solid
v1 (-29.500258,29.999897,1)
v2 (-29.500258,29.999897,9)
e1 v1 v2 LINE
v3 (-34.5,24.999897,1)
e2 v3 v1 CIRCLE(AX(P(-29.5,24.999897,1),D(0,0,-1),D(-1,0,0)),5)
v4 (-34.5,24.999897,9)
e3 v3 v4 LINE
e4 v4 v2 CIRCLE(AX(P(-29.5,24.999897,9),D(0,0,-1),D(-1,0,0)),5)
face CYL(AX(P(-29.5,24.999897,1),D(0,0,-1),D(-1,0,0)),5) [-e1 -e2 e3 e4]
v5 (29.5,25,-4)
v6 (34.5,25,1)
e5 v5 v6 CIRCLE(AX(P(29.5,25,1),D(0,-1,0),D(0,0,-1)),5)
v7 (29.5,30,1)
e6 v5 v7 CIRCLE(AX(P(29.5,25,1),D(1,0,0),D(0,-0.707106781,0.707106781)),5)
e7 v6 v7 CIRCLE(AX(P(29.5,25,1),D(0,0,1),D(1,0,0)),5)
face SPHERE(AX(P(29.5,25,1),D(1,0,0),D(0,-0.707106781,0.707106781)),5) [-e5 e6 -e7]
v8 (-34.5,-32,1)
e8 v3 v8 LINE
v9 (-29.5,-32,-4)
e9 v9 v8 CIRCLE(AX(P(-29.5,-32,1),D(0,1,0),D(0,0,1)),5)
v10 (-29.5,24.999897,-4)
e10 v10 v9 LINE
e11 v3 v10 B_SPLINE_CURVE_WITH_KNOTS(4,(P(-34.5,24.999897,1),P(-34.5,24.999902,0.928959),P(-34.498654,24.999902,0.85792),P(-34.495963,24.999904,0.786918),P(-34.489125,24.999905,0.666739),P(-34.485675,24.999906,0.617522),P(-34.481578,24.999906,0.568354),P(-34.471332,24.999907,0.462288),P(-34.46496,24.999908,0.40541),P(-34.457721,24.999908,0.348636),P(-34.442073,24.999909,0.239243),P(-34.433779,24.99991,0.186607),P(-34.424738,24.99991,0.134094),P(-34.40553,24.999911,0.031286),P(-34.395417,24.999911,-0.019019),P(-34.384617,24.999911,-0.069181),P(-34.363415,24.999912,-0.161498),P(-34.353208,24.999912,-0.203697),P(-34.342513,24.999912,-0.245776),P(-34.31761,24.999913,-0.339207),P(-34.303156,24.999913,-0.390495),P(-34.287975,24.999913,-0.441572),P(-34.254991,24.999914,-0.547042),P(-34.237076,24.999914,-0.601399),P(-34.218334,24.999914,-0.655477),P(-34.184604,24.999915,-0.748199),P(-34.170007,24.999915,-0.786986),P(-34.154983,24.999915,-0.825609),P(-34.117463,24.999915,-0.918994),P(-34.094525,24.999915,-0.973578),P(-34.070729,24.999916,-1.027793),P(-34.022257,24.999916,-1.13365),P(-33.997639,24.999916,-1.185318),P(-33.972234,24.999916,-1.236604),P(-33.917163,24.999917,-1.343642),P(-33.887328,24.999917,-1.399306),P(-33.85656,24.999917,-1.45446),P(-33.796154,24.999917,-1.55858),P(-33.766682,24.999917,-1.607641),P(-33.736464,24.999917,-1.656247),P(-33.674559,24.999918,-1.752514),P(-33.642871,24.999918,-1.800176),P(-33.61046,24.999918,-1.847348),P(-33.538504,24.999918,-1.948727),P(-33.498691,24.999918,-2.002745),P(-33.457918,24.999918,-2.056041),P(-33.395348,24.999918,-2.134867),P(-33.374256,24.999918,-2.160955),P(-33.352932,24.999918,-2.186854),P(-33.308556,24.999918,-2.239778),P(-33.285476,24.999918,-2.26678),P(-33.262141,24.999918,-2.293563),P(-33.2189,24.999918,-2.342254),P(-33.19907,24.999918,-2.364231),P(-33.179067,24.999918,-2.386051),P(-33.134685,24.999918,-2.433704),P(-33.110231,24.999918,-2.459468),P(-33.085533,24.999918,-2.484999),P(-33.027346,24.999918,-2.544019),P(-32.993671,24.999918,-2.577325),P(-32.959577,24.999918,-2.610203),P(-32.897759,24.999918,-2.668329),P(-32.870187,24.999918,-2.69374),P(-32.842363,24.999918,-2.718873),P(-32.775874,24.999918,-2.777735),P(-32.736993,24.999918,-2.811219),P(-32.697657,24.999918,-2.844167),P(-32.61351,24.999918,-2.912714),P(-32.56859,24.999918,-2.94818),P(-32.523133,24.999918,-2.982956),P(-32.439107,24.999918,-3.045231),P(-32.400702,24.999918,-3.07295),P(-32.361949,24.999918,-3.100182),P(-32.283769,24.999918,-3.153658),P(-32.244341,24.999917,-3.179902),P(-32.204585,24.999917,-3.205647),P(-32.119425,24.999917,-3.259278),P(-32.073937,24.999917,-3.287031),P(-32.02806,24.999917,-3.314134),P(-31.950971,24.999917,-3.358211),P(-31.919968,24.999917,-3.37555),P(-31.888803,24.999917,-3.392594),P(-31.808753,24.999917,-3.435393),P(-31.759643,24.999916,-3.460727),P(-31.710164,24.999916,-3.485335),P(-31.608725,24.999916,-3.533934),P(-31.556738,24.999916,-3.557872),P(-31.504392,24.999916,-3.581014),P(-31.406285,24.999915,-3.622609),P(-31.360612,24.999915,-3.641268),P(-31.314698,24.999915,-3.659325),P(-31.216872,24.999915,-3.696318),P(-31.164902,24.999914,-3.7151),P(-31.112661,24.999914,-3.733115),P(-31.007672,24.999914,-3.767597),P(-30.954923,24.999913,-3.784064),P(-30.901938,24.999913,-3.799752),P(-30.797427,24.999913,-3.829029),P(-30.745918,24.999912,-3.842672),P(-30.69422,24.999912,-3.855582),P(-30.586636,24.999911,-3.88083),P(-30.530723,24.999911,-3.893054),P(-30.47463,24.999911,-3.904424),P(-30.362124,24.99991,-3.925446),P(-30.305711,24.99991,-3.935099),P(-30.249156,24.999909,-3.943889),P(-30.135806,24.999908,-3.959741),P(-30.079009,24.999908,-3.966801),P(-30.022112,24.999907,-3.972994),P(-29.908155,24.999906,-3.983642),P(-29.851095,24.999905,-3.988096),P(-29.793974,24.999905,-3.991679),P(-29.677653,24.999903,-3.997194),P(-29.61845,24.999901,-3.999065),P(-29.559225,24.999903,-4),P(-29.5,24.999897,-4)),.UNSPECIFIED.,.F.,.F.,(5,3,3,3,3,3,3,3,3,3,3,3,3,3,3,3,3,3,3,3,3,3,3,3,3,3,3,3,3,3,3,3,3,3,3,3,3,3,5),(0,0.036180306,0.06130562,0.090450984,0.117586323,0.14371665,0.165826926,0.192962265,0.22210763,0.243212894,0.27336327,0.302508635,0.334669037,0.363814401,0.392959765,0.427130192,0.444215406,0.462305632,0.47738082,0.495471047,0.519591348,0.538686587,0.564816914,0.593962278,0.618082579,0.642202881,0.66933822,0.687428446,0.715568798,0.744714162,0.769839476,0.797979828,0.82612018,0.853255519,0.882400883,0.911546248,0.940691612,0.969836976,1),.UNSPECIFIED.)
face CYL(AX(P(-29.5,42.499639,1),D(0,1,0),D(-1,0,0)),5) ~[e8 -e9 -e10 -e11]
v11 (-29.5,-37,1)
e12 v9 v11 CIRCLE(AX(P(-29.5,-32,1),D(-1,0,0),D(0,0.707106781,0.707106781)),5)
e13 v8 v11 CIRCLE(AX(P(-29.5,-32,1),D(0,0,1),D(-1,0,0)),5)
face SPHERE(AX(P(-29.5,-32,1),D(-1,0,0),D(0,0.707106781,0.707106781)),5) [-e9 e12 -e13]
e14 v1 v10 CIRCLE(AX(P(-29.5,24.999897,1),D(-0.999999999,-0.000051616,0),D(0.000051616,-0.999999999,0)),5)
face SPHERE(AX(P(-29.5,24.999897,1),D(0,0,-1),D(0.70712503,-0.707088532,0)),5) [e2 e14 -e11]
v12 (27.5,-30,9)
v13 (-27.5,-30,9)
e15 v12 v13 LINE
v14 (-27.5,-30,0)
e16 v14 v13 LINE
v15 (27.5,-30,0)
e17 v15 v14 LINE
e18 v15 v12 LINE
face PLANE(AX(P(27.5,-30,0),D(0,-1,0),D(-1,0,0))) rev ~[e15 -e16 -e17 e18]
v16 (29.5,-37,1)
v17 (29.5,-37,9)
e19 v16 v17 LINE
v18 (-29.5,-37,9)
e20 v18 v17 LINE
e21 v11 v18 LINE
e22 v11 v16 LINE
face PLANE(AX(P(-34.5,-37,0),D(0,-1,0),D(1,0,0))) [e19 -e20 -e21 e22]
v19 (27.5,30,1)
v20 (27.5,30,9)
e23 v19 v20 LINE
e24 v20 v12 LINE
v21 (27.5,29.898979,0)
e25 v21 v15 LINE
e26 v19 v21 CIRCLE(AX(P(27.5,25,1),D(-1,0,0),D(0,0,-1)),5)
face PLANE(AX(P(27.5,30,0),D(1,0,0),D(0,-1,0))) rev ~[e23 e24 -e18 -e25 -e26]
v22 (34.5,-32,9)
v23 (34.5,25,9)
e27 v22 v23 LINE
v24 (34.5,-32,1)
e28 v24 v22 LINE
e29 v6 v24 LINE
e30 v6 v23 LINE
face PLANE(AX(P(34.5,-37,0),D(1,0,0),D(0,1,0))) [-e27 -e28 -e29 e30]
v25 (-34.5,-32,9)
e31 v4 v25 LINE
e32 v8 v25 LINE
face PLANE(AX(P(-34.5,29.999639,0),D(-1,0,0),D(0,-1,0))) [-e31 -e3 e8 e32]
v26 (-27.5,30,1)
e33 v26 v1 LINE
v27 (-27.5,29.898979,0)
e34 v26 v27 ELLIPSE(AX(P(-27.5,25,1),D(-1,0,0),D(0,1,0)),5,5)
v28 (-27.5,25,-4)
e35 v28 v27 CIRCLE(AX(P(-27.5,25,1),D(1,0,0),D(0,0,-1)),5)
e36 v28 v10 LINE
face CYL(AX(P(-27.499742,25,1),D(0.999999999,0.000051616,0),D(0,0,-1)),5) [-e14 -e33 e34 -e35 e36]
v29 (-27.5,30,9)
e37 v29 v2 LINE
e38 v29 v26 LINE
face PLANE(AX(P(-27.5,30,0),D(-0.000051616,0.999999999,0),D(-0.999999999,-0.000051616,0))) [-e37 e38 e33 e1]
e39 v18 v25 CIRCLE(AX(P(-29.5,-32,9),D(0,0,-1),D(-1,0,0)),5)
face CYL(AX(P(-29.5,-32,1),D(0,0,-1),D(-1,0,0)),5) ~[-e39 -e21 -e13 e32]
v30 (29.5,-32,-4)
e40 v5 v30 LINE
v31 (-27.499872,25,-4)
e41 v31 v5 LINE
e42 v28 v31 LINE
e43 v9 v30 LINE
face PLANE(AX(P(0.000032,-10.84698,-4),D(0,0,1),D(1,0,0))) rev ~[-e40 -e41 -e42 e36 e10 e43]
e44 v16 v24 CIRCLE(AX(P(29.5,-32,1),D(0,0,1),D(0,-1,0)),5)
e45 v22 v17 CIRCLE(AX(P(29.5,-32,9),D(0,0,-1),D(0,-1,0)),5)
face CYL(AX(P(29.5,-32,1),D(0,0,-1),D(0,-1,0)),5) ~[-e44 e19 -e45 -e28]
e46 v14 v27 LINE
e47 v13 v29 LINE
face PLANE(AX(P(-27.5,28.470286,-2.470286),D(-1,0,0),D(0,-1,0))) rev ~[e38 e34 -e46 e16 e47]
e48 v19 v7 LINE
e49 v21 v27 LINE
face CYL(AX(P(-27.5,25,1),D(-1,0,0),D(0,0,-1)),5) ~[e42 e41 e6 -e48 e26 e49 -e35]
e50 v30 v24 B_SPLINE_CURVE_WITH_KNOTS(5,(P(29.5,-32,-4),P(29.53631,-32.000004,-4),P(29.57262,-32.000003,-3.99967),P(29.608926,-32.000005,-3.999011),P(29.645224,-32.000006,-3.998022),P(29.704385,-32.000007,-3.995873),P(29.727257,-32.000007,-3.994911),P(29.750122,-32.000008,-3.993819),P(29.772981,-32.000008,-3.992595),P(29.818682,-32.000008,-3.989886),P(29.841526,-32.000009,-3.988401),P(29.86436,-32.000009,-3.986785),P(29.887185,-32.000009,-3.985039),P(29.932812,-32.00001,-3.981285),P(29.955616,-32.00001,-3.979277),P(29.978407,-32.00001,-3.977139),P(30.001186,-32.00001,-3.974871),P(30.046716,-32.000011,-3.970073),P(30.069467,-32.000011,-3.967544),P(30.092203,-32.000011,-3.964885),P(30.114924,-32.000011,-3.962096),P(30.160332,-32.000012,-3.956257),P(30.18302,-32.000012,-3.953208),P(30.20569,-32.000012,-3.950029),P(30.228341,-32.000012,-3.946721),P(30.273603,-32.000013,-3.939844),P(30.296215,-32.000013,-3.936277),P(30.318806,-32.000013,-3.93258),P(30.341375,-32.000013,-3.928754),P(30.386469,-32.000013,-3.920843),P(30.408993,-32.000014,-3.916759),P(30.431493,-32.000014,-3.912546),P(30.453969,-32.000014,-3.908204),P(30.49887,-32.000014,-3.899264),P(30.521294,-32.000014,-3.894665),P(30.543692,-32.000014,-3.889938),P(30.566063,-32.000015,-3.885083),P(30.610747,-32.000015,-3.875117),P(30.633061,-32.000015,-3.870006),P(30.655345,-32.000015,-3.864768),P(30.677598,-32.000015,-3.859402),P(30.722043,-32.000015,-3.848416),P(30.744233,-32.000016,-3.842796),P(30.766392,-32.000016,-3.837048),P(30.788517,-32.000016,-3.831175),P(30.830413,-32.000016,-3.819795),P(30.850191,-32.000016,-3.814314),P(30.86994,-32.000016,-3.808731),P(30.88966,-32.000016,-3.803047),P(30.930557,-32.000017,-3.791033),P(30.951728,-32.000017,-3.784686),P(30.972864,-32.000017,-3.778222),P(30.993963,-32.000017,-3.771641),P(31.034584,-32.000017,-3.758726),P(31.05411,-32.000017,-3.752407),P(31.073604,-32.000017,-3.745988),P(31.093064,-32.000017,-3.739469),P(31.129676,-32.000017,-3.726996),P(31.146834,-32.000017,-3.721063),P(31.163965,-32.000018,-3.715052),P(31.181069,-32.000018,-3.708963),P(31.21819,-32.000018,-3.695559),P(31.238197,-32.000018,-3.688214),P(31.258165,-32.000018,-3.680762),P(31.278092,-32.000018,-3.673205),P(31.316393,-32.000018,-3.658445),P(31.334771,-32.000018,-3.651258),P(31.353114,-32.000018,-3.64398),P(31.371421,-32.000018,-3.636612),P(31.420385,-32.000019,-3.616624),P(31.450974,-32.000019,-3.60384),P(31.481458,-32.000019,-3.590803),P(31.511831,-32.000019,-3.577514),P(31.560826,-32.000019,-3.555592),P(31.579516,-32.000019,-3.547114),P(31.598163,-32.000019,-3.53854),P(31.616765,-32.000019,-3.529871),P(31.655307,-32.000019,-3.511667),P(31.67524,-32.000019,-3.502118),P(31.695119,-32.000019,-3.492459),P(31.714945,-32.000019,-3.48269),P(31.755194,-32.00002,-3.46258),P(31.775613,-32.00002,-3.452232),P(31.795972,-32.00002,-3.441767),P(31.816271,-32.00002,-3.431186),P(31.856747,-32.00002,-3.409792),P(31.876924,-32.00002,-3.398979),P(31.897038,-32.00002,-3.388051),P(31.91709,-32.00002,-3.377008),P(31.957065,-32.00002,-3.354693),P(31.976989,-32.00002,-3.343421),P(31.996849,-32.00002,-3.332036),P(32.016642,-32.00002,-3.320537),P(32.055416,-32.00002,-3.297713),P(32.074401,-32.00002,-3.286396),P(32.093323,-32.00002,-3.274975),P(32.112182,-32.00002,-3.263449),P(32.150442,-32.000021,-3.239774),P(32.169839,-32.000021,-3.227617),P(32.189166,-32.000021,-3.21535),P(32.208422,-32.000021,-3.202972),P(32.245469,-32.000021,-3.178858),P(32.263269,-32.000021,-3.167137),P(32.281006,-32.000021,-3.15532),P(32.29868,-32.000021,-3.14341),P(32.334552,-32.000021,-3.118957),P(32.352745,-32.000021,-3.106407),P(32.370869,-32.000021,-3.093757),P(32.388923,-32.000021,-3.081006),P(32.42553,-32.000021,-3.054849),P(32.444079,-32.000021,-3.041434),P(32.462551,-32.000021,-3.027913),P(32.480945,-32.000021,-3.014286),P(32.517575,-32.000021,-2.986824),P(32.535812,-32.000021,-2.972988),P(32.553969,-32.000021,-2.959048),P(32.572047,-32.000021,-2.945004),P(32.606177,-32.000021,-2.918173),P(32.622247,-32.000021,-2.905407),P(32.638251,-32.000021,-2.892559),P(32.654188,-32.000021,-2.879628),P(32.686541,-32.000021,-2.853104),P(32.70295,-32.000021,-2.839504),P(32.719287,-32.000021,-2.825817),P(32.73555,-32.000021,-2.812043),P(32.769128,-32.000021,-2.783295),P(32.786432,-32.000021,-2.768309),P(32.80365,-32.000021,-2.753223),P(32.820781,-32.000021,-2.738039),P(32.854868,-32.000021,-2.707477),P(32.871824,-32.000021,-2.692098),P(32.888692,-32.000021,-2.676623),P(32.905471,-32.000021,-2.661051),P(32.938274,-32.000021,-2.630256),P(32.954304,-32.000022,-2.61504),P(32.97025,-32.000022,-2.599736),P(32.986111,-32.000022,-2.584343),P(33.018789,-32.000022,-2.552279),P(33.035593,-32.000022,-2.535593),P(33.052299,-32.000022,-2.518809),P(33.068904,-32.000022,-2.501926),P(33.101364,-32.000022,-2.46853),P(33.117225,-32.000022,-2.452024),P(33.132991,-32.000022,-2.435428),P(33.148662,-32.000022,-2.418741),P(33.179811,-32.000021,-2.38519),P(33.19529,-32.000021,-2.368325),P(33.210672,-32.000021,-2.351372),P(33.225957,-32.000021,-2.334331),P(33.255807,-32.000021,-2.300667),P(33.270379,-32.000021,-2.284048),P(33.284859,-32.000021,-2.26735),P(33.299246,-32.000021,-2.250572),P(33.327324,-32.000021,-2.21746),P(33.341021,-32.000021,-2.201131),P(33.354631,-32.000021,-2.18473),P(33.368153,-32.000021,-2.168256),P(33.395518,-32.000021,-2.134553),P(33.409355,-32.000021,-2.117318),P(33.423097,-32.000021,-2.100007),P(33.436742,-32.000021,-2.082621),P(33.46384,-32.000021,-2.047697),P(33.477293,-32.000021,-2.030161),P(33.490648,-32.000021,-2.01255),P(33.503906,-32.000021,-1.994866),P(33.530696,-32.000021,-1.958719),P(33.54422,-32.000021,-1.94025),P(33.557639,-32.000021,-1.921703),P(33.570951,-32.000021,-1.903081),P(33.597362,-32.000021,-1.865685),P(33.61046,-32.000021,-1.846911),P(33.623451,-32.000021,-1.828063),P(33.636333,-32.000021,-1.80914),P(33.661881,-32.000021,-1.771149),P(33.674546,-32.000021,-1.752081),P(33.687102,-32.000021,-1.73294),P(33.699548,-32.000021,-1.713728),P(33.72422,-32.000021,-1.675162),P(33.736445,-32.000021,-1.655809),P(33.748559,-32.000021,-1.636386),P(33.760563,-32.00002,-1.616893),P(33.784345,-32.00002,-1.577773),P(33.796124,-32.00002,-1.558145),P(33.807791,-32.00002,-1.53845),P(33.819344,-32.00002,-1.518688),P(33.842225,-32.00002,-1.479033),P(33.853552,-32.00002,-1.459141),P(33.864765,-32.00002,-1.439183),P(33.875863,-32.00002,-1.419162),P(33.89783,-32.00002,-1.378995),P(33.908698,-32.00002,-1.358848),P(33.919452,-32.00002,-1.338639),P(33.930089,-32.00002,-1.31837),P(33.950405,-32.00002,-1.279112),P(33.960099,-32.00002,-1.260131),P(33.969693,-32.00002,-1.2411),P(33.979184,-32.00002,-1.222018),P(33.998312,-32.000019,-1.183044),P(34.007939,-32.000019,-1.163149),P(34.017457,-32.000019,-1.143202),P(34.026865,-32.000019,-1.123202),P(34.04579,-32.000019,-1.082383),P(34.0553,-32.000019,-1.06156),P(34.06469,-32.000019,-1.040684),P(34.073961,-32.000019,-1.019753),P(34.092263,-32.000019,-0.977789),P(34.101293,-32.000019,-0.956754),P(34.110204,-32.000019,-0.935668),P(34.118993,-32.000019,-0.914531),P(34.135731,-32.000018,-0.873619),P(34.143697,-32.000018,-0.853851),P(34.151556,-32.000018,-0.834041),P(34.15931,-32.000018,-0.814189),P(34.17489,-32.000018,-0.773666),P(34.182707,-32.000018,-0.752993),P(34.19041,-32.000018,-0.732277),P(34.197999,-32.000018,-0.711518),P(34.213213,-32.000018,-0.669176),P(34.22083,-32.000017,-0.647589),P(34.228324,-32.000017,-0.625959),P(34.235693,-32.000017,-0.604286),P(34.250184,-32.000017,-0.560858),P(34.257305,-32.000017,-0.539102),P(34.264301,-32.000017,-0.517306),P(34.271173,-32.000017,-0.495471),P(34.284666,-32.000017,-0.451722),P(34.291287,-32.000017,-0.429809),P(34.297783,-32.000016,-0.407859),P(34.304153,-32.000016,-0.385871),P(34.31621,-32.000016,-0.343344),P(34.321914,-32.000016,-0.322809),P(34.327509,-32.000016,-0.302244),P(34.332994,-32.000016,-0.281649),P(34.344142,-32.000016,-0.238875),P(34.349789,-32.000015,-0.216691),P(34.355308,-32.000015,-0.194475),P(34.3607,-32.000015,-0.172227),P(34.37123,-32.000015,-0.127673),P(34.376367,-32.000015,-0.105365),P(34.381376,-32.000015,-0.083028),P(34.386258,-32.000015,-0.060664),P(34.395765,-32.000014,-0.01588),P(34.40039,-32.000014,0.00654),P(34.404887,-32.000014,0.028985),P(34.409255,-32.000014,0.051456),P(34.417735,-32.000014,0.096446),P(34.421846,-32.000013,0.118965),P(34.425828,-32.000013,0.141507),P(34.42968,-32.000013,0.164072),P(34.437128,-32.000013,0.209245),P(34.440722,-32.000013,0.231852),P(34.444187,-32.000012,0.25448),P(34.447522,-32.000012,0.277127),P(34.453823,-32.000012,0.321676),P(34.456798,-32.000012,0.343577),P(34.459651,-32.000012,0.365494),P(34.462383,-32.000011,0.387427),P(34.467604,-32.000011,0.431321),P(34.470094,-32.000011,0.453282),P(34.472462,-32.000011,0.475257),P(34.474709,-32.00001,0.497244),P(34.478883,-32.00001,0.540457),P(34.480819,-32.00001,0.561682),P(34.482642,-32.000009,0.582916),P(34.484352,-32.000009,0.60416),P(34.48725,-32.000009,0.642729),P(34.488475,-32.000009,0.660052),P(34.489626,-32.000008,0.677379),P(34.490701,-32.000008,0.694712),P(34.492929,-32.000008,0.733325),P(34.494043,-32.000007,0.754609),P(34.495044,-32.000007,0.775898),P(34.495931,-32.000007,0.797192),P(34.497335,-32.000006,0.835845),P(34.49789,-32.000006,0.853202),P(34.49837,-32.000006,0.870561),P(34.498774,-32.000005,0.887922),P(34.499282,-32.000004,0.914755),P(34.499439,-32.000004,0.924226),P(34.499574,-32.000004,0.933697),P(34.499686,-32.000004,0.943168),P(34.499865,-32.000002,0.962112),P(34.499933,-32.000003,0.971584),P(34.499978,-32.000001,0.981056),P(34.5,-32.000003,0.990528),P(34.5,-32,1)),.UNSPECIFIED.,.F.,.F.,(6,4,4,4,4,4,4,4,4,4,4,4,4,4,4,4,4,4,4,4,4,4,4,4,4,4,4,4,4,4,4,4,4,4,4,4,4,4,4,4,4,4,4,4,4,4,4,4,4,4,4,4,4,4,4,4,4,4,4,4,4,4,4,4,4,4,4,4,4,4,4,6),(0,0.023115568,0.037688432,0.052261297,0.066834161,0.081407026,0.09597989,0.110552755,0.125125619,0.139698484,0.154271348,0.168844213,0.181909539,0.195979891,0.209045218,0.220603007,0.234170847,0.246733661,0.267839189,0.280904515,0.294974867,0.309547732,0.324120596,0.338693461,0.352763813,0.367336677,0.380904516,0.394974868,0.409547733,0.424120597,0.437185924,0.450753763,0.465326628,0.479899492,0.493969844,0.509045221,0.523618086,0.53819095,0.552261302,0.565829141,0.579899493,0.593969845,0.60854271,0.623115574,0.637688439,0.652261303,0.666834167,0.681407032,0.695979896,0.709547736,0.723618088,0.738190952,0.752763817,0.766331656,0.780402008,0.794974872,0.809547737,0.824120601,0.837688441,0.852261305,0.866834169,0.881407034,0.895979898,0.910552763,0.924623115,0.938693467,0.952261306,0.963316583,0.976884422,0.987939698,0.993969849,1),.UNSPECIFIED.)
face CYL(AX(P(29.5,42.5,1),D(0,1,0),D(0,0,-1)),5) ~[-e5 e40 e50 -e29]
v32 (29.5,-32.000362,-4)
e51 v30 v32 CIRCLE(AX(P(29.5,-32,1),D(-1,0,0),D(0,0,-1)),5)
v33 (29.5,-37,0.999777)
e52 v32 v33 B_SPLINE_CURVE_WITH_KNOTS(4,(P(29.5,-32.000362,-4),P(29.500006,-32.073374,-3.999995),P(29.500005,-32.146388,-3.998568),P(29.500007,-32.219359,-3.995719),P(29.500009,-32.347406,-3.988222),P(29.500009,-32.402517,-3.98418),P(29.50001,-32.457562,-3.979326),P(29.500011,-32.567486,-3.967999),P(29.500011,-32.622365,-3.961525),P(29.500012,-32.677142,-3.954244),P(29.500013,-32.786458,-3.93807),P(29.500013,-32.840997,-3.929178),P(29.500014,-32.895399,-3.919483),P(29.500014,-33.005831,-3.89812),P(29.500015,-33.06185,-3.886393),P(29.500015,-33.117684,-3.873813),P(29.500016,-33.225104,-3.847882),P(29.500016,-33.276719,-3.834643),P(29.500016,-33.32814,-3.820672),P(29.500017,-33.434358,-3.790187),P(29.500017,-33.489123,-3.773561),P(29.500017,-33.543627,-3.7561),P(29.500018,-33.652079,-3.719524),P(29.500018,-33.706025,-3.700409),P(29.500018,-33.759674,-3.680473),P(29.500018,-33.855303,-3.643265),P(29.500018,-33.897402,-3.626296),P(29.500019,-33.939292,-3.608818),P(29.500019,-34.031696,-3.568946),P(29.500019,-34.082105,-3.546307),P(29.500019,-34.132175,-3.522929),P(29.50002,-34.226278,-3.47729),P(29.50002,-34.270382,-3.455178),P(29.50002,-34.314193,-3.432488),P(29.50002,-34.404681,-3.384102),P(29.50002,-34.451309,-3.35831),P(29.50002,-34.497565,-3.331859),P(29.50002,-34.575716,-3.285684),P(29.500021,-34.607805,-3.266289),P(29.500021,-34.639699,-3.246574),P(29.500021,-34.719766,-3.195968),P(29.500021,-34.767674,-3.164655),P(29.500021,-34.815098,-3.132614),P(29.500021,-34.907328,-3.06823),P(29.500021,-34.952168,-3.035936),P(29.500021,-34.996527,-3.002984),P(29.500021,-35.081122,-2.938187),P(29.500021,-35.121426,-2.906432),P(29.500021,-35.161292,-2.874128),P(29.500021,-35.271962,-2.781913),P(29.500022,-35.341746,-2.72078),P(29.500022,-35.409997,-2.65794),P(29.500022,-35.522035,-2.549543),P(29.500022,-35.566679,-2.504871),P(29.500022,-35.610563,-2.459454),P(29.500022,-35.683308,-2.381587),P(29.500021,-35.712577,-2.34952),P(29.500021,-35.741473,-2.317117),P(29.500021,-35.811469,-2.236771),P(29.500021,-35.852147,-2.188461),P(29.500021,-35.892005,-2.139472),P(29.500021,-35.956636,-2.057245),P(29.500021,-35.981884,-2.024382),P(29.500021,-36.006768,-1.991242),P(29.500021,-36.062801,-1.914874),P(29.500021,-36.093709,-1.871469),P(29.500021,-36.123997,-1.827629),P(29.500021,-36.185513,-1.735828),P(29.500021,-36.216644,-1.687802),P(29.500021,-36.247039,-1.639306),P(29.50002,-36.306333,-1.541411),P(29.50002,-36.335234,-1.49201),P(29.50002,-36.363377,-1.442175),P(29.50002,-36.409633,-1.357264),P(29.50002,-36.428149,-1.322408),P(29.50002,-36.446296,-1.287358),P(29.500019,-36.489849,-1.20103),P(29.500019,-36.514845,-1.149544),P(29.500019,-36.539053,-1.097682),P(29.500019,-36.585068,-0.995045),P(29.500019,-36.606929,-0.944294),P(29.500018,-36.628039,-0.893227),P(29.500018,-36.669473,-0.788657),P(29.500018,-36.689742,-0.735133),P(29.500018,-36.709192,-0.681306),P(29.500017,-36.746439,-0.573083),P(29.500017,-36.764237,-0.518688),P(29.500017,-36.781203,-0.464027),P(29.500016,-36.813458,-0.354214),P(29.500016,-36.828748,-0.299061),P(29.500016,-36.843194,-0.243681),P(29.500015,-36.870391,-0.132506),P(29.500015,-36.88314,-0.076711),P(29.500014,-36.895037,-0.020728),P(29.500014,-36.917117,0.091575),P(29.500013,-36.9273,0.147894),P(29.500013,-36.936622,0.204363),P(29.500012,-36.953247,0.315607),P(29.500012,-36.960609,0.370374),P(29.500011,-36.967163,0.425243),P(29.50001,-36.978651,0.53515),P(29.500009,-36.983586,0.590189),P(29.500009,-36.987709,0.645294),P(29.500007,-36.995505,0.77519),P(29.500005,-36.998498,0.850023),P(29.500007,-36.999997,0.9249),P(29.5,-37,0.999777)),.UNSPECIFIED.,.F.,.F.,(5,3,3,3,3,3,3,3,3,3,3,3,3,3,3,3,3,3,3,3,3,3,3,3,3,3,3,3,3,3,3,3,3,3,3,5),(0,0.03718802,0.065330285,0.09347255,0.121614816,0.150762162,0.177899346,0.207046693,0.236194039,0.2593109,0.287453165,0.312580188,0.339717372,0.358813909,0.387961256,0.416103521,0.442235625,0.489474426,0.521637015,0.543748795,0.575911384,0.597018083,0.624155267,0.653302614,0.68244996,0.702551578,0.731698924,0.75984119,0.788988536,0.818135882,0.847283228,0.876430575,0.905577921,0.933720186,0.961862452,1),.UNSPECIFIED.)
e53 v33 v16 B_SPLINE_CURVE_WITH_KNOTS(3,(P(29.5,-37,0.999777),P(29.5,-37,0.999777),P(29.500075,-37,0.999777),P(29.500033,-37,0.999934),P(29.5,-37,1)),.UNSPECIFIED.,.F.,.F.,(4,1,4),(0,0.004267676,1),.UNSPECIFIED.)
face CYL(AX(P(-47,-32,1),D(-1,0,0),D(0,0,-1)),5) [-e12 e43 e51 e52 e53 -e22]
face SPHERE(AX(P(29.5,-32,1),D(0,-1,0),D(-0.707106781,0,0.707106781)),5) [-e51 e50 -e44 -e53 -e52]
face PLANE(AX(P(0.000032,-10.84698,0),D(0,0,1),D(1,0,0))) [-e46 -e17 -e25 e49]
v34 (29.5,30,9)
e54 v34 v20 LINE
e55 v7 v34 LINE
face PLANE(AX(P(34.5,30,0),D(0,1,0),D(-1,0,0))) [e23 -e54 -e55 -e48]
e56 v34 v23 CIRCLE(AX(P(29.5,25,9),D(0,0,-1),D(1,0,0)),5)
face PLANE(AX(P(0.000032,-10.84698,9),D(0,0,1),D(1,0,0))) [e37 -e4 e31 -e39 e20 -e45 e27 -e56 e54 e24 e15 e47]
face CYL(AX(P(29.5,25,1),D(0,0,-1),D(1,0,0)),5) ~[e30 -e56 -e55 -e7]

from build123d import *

# Parameters (mm, degrees)
F1_DEPTH     = 9
F0_W         = 55
F0_H         = 60
F2_DEPTH     = 4
F3_T1_DEPTH  = 74.5
F3_T3_DEPTH  = 19.5
F3_T5_DEPTH  = 92
F3_T7_DEPTH  = 91.9996386864
F3_T9_DEPTH  = 93.9999999907
F4_T1_DEPTH  = 20.5
F4_T3_DEPTH  = 20.4993548139
F4_T8_DEPTH  = 5
F4_S13_W     = 5
F4_S13_H     = 5
F4_T14_DEPTH = 5
F4_S19_W     = 5
F4_S19_H     = 5
F4_T20_DEPTH = 5
F4_S25_W     = 5
F4_S25_H     = 5
F4_T26_DEPTH = 5


# Not quite as in the source:
# - a fillet or chamfer that OpenCascade refuses, or shapes differently, is made with other operations: its cross-section is extruded or revolved along the edge and cut away or added


with BuildPart() as f1:
    # F0 (on Top) → F1 (new body)
    with BuildSketch(Plane.XY):
        Polygon((27.5, 30), (27.5, -30), (-27.5, -30), (-27.5, 30), (-34.4999999907, 29.9996386864), (-34.4999999907, -37), (34.5, -37), (34.5, 30), align=None)
    extrude(amount=F1_DEPTH)

    # F0 (on Top) → F2 (join)
    with BuildSketch(Plane.XY):
        Polygon((27.5, 30), (27.5, -30), (-27.5, -30), (-27.5, 30), (-34.4999999907, 29.9996386864), (-34.4999999907, -37), (34.5, -37), (34.5, 30), align=None)
        Rectangle(F0_W, F0_H)
    extrude(amount=-F2_DEPTH)

    # F3: fillet of radius 5 on 5 edges, made by hand

    # F3_s2 → F3_t1 (cut)
    with BuildSketch(Plane.YZ.offset(-27.5)):
        with BuildLine():
            ThreePointArc((25, -4), (28.5355339059, -2.5355339059), (30, 1))
            Line((30, 1), (30, -4))
            Line((30, -4), (25, -4))
        make_face()
    extrude(amount=F3_T1_DEPTH, mode=Mode.SUBTRACT)

    # F3_s4 → F3_t3 (cut)
    with BuildSketch(Plane(origin=(-27.4984514401, -0.0014193662, 0), x_dir=(0, 0, 1), z_dir=(-0.9999999987, -5.16162e-05, 0))):
        with BuildLine():
            ThreePointArc((-4, 25.0014194062), (-2.5355339059, 28.5369533121), (1, 30.0014194062))
            Line((1, 30.0014194062), (-4, 30.0014194062))
            Line((-4, 30.0014194062), (-4, 25.0014194062))
        make_face()
    extrude(amount=F3_T3_DEPTH, mode=Mode.SUBTRACT)

    # F3_s6 → F3_t5 (cut)
    with BuildSketch(Plane.XZ.offset(-42.5)):
        with BuildLine():
            ThreePointArc((29.5, -4), (33.0355339059, -2.5355339059), (34.5, 1))
            Line((34.5, 1), (34.5, -4))
            Line((34.5, -4), (29.5, -4))
        make_face()
    extrude(amount=F3_T5_DEPTH, mode=Mode.SUBTRACT)

    # F3_s8 → F3_t7 (cut)
    with BuildSketch(Plane.XZ.offset(-42.4996386864)):
        with BuildLine():
            ThreePointArc((-34.4999999907, 1), (-33.0355338966, -2.5355339059), (-29.4999999907, -4))
            Line((-29.4999999907, -4), (-34.4999999907, -4))
            Line((-34.4999999907, -4), (-34.4999999907, 1))
        make_face()
    extrude(amount=F3_T7_DEPTH, mode=Mode.SUBTRACT)

    # F3_s10 → F3_t9 (cut)
    with BuildSketch(Plane.YZ.offset(-46.9999999907)):
        with BuildLine():
            ThreePointArc((-32, -4), (-35.5355339059, -2.5355339059), (-37, 1))
            Line((-37, 1), (-37, -4))
            Line((-37, -4), (-32, -4))
        make_face()
    extrude(amount=F3_T9_DEPTH, mode=Mode.SUBTRACT)

    # F4: fillet of radius 5 on 4 edges, made by hand

    # F4_s2 → F4_t1 (cut)
    with BuildSketch(Plane.XY.offset(1)):
        with BuildLine():
            ThreePointArc((-34.4999999907, -32), (-33.0355338966, -35.5355339059), (-29.4999999907, -37))
            Line((-29.4999999907, -37), (-34.4999999907, -37))
            Line((-34.4999999907, -37), (-34.4999999907, -32))
        make_face()
        with BuildLine():
            ThreePointArc((29.5, -37), (33.0355339059, -35.5355339059), (34.5, -32))
            Line((34.5, -32), (34.5, -37))
            Line((34.5, -37), (29.5, -37))
        make_face()
        with BuildLine():
            ThreePointArc((34.5, 25), (33.0355339059, 28.5355339059), (29.5, 30))
            Line((29.5, 30), (34.5, 30))
            Line((34.5, 30), (34.5, 25))
        make_face()
    extrude(amount=F4_T1_DEPTH, mode=Mode.SUBTRACT)

    # F4_s4 → F4_t3 (cut)
    with BuildSketch(Plane.XY.offset(1)):
        with BuildLine():
            ThreePointArc((-34.4999999907, 24.9998967609), (-33.0356251409, 28.5353394202), (-29.5002580718, 29.9998967542))
            Line((-29.5002580718, 29.9998967542), (-34.4999999907, 29.9996386864))
            Line((-34.4999999907, 29.9996386864), (-34.4999999907, 24.9998967609))
        make_face()
    extrude(amount=F4_T3_DEPTH, mode=Mode.SUBTRACT)


with BuildPart() as f4_tool6:
    # F4_s7 → F4_t8 (new body)
    with BuildSketch(Plane.XY.offset(1)):
        Polygon((-29.4999999907, 24.9998967609), (-34.4999999907, 24.9998967609), (-34.4999999907, 29.9996386864), (-29.5002580718, 29.9998967542), align=None)
    extrude(amount=-F4_T8_DEPTH)

    # F4_s9 → F4_t10 (revolve, cut)
    with BuildSketch(Plane(origin=(-29.4999999907, 24.9998967609, 1), x_dir=(0.70712503, -0.7070885319, 0), z_dir=(0.7070885319, 0.70712503, 0))):
        with BuildLine():
            ThreePointArc((0, -5), (5, 0), (0, 5))
            Line((0, 5), (0, -5))
        make_face()
    revolve(axis=Axis((-29.4999999907, 24.9998967609, 1), (0, 0, -1)), mode=Mode.SUBTRACT)


with BuildPart() as f1_1:
    add(f1.part)

    # F4_t5: cut F4_tool6
    add(f4_tool6.part, mode=Mode.SUBTRACT)


with BuildPart() as f4_tool12:
    # F4_s13 → F4_t14 (new body)
    with BuildSketch(Plane.YZ.offset(29.5)):
        with Locations((27.5, -1.5)):
            Rectangle(F4_S13_W, F4_S13_H)
    extrude(amount=F4_T14_DEPTH)

    # F4_s15 → F4_t16 (revolve, cut)
    with BuildSketch(Plane(origin=(29.5, 25, 1), x_dir=(0, -0.7071067812, 0.7071067812), z_dir=(0, 0.7071067812, 0.7071067812))):
        with BuildLine():
            ThreePointArc((0, -5), (5, 0), (0, 5))
            Line((0, 5), (0, -5))
        make_face()
    revolve(axis=Axis((29.5, 25, 1), (1, 0, 0)), mode=Mode.SUBTRACT)


with BuildPart() as f1_2:
    add(f1_1.part)

    # F4_t11: cut F4_tool12
    add(f4_tool12.part, mode=Mode.SUBTRACT)


with BuildPart() as f4_tool18:
    # F4_s19 → F4_t20 (new body)
    with BuildSketch(Plane.XZ.offset(32)):
        with Locations((32, -1.5)):
            Rectangle(F4_S19_W, F4_S19_H)
    extrude(amount=F4_T20_DEPTH)

    # F4_s21 → F4_t22 (revolve, cut)
    with BuildSketch(Plane(origin=(29.5, -32, 1), x_dir=(-0.7071067812, 0, 0.7071067812), z_dir=(0.7071067812, 0, 0.7071067812))):
        with BuildLine():
            ThreePointArc((0, -5), (5, 0), (0, 5))
            Line((0, 5), (0, -5))
        make_face()
    revolve(axis=Axis((29.5, -32, 1), (0, -1, 0)), mode=Mode.SUBTRACT)


with BuildPart() as f1_3:
    add(f1_2.part)

    # F4_t17: cut F4_tool18
    add(f4_tool18.part, mode=Mode.SUBTRACT)


with BuildPart() as f4_tool24:
    # F4_s25 → F4_t26 (new body)
    with BuildSketch(Plane.YZ.offset(-29.4999999907)):
        with Locations((-34.5, -1.5)):
            Rectangle(F4_S25_W, F4_S25_H)
    extrude(amount=-F4_T26_DEPTH)

    # F4_s27 → F4_t28 (revolve, cut)
    with BuildSketch(Plane(origin=(-29.4999999907, -32, 1), x_dir=(0, 0.7071067812, 0.7071067812), z_dir=(0, -0.7071067812, 0.7071067812))):
        with BuildLine():
            ThreePointArc((0, -5), (5, 0), (0, 5))
            Line((0, 5), (0, -5))
        make_face()
    revolve(axis=Axis((-29.4999999907, -32, 1), (-1, 0, 0)), mode=Mode.SUBTRACT)


with BuildPart() as f1_4:
    add(f1_3.part)

    # F4_t23: cut F4_tool24
    add(f4_tool24.part, mode=Mode.SUBTRACT)


solid = f1_4.part
